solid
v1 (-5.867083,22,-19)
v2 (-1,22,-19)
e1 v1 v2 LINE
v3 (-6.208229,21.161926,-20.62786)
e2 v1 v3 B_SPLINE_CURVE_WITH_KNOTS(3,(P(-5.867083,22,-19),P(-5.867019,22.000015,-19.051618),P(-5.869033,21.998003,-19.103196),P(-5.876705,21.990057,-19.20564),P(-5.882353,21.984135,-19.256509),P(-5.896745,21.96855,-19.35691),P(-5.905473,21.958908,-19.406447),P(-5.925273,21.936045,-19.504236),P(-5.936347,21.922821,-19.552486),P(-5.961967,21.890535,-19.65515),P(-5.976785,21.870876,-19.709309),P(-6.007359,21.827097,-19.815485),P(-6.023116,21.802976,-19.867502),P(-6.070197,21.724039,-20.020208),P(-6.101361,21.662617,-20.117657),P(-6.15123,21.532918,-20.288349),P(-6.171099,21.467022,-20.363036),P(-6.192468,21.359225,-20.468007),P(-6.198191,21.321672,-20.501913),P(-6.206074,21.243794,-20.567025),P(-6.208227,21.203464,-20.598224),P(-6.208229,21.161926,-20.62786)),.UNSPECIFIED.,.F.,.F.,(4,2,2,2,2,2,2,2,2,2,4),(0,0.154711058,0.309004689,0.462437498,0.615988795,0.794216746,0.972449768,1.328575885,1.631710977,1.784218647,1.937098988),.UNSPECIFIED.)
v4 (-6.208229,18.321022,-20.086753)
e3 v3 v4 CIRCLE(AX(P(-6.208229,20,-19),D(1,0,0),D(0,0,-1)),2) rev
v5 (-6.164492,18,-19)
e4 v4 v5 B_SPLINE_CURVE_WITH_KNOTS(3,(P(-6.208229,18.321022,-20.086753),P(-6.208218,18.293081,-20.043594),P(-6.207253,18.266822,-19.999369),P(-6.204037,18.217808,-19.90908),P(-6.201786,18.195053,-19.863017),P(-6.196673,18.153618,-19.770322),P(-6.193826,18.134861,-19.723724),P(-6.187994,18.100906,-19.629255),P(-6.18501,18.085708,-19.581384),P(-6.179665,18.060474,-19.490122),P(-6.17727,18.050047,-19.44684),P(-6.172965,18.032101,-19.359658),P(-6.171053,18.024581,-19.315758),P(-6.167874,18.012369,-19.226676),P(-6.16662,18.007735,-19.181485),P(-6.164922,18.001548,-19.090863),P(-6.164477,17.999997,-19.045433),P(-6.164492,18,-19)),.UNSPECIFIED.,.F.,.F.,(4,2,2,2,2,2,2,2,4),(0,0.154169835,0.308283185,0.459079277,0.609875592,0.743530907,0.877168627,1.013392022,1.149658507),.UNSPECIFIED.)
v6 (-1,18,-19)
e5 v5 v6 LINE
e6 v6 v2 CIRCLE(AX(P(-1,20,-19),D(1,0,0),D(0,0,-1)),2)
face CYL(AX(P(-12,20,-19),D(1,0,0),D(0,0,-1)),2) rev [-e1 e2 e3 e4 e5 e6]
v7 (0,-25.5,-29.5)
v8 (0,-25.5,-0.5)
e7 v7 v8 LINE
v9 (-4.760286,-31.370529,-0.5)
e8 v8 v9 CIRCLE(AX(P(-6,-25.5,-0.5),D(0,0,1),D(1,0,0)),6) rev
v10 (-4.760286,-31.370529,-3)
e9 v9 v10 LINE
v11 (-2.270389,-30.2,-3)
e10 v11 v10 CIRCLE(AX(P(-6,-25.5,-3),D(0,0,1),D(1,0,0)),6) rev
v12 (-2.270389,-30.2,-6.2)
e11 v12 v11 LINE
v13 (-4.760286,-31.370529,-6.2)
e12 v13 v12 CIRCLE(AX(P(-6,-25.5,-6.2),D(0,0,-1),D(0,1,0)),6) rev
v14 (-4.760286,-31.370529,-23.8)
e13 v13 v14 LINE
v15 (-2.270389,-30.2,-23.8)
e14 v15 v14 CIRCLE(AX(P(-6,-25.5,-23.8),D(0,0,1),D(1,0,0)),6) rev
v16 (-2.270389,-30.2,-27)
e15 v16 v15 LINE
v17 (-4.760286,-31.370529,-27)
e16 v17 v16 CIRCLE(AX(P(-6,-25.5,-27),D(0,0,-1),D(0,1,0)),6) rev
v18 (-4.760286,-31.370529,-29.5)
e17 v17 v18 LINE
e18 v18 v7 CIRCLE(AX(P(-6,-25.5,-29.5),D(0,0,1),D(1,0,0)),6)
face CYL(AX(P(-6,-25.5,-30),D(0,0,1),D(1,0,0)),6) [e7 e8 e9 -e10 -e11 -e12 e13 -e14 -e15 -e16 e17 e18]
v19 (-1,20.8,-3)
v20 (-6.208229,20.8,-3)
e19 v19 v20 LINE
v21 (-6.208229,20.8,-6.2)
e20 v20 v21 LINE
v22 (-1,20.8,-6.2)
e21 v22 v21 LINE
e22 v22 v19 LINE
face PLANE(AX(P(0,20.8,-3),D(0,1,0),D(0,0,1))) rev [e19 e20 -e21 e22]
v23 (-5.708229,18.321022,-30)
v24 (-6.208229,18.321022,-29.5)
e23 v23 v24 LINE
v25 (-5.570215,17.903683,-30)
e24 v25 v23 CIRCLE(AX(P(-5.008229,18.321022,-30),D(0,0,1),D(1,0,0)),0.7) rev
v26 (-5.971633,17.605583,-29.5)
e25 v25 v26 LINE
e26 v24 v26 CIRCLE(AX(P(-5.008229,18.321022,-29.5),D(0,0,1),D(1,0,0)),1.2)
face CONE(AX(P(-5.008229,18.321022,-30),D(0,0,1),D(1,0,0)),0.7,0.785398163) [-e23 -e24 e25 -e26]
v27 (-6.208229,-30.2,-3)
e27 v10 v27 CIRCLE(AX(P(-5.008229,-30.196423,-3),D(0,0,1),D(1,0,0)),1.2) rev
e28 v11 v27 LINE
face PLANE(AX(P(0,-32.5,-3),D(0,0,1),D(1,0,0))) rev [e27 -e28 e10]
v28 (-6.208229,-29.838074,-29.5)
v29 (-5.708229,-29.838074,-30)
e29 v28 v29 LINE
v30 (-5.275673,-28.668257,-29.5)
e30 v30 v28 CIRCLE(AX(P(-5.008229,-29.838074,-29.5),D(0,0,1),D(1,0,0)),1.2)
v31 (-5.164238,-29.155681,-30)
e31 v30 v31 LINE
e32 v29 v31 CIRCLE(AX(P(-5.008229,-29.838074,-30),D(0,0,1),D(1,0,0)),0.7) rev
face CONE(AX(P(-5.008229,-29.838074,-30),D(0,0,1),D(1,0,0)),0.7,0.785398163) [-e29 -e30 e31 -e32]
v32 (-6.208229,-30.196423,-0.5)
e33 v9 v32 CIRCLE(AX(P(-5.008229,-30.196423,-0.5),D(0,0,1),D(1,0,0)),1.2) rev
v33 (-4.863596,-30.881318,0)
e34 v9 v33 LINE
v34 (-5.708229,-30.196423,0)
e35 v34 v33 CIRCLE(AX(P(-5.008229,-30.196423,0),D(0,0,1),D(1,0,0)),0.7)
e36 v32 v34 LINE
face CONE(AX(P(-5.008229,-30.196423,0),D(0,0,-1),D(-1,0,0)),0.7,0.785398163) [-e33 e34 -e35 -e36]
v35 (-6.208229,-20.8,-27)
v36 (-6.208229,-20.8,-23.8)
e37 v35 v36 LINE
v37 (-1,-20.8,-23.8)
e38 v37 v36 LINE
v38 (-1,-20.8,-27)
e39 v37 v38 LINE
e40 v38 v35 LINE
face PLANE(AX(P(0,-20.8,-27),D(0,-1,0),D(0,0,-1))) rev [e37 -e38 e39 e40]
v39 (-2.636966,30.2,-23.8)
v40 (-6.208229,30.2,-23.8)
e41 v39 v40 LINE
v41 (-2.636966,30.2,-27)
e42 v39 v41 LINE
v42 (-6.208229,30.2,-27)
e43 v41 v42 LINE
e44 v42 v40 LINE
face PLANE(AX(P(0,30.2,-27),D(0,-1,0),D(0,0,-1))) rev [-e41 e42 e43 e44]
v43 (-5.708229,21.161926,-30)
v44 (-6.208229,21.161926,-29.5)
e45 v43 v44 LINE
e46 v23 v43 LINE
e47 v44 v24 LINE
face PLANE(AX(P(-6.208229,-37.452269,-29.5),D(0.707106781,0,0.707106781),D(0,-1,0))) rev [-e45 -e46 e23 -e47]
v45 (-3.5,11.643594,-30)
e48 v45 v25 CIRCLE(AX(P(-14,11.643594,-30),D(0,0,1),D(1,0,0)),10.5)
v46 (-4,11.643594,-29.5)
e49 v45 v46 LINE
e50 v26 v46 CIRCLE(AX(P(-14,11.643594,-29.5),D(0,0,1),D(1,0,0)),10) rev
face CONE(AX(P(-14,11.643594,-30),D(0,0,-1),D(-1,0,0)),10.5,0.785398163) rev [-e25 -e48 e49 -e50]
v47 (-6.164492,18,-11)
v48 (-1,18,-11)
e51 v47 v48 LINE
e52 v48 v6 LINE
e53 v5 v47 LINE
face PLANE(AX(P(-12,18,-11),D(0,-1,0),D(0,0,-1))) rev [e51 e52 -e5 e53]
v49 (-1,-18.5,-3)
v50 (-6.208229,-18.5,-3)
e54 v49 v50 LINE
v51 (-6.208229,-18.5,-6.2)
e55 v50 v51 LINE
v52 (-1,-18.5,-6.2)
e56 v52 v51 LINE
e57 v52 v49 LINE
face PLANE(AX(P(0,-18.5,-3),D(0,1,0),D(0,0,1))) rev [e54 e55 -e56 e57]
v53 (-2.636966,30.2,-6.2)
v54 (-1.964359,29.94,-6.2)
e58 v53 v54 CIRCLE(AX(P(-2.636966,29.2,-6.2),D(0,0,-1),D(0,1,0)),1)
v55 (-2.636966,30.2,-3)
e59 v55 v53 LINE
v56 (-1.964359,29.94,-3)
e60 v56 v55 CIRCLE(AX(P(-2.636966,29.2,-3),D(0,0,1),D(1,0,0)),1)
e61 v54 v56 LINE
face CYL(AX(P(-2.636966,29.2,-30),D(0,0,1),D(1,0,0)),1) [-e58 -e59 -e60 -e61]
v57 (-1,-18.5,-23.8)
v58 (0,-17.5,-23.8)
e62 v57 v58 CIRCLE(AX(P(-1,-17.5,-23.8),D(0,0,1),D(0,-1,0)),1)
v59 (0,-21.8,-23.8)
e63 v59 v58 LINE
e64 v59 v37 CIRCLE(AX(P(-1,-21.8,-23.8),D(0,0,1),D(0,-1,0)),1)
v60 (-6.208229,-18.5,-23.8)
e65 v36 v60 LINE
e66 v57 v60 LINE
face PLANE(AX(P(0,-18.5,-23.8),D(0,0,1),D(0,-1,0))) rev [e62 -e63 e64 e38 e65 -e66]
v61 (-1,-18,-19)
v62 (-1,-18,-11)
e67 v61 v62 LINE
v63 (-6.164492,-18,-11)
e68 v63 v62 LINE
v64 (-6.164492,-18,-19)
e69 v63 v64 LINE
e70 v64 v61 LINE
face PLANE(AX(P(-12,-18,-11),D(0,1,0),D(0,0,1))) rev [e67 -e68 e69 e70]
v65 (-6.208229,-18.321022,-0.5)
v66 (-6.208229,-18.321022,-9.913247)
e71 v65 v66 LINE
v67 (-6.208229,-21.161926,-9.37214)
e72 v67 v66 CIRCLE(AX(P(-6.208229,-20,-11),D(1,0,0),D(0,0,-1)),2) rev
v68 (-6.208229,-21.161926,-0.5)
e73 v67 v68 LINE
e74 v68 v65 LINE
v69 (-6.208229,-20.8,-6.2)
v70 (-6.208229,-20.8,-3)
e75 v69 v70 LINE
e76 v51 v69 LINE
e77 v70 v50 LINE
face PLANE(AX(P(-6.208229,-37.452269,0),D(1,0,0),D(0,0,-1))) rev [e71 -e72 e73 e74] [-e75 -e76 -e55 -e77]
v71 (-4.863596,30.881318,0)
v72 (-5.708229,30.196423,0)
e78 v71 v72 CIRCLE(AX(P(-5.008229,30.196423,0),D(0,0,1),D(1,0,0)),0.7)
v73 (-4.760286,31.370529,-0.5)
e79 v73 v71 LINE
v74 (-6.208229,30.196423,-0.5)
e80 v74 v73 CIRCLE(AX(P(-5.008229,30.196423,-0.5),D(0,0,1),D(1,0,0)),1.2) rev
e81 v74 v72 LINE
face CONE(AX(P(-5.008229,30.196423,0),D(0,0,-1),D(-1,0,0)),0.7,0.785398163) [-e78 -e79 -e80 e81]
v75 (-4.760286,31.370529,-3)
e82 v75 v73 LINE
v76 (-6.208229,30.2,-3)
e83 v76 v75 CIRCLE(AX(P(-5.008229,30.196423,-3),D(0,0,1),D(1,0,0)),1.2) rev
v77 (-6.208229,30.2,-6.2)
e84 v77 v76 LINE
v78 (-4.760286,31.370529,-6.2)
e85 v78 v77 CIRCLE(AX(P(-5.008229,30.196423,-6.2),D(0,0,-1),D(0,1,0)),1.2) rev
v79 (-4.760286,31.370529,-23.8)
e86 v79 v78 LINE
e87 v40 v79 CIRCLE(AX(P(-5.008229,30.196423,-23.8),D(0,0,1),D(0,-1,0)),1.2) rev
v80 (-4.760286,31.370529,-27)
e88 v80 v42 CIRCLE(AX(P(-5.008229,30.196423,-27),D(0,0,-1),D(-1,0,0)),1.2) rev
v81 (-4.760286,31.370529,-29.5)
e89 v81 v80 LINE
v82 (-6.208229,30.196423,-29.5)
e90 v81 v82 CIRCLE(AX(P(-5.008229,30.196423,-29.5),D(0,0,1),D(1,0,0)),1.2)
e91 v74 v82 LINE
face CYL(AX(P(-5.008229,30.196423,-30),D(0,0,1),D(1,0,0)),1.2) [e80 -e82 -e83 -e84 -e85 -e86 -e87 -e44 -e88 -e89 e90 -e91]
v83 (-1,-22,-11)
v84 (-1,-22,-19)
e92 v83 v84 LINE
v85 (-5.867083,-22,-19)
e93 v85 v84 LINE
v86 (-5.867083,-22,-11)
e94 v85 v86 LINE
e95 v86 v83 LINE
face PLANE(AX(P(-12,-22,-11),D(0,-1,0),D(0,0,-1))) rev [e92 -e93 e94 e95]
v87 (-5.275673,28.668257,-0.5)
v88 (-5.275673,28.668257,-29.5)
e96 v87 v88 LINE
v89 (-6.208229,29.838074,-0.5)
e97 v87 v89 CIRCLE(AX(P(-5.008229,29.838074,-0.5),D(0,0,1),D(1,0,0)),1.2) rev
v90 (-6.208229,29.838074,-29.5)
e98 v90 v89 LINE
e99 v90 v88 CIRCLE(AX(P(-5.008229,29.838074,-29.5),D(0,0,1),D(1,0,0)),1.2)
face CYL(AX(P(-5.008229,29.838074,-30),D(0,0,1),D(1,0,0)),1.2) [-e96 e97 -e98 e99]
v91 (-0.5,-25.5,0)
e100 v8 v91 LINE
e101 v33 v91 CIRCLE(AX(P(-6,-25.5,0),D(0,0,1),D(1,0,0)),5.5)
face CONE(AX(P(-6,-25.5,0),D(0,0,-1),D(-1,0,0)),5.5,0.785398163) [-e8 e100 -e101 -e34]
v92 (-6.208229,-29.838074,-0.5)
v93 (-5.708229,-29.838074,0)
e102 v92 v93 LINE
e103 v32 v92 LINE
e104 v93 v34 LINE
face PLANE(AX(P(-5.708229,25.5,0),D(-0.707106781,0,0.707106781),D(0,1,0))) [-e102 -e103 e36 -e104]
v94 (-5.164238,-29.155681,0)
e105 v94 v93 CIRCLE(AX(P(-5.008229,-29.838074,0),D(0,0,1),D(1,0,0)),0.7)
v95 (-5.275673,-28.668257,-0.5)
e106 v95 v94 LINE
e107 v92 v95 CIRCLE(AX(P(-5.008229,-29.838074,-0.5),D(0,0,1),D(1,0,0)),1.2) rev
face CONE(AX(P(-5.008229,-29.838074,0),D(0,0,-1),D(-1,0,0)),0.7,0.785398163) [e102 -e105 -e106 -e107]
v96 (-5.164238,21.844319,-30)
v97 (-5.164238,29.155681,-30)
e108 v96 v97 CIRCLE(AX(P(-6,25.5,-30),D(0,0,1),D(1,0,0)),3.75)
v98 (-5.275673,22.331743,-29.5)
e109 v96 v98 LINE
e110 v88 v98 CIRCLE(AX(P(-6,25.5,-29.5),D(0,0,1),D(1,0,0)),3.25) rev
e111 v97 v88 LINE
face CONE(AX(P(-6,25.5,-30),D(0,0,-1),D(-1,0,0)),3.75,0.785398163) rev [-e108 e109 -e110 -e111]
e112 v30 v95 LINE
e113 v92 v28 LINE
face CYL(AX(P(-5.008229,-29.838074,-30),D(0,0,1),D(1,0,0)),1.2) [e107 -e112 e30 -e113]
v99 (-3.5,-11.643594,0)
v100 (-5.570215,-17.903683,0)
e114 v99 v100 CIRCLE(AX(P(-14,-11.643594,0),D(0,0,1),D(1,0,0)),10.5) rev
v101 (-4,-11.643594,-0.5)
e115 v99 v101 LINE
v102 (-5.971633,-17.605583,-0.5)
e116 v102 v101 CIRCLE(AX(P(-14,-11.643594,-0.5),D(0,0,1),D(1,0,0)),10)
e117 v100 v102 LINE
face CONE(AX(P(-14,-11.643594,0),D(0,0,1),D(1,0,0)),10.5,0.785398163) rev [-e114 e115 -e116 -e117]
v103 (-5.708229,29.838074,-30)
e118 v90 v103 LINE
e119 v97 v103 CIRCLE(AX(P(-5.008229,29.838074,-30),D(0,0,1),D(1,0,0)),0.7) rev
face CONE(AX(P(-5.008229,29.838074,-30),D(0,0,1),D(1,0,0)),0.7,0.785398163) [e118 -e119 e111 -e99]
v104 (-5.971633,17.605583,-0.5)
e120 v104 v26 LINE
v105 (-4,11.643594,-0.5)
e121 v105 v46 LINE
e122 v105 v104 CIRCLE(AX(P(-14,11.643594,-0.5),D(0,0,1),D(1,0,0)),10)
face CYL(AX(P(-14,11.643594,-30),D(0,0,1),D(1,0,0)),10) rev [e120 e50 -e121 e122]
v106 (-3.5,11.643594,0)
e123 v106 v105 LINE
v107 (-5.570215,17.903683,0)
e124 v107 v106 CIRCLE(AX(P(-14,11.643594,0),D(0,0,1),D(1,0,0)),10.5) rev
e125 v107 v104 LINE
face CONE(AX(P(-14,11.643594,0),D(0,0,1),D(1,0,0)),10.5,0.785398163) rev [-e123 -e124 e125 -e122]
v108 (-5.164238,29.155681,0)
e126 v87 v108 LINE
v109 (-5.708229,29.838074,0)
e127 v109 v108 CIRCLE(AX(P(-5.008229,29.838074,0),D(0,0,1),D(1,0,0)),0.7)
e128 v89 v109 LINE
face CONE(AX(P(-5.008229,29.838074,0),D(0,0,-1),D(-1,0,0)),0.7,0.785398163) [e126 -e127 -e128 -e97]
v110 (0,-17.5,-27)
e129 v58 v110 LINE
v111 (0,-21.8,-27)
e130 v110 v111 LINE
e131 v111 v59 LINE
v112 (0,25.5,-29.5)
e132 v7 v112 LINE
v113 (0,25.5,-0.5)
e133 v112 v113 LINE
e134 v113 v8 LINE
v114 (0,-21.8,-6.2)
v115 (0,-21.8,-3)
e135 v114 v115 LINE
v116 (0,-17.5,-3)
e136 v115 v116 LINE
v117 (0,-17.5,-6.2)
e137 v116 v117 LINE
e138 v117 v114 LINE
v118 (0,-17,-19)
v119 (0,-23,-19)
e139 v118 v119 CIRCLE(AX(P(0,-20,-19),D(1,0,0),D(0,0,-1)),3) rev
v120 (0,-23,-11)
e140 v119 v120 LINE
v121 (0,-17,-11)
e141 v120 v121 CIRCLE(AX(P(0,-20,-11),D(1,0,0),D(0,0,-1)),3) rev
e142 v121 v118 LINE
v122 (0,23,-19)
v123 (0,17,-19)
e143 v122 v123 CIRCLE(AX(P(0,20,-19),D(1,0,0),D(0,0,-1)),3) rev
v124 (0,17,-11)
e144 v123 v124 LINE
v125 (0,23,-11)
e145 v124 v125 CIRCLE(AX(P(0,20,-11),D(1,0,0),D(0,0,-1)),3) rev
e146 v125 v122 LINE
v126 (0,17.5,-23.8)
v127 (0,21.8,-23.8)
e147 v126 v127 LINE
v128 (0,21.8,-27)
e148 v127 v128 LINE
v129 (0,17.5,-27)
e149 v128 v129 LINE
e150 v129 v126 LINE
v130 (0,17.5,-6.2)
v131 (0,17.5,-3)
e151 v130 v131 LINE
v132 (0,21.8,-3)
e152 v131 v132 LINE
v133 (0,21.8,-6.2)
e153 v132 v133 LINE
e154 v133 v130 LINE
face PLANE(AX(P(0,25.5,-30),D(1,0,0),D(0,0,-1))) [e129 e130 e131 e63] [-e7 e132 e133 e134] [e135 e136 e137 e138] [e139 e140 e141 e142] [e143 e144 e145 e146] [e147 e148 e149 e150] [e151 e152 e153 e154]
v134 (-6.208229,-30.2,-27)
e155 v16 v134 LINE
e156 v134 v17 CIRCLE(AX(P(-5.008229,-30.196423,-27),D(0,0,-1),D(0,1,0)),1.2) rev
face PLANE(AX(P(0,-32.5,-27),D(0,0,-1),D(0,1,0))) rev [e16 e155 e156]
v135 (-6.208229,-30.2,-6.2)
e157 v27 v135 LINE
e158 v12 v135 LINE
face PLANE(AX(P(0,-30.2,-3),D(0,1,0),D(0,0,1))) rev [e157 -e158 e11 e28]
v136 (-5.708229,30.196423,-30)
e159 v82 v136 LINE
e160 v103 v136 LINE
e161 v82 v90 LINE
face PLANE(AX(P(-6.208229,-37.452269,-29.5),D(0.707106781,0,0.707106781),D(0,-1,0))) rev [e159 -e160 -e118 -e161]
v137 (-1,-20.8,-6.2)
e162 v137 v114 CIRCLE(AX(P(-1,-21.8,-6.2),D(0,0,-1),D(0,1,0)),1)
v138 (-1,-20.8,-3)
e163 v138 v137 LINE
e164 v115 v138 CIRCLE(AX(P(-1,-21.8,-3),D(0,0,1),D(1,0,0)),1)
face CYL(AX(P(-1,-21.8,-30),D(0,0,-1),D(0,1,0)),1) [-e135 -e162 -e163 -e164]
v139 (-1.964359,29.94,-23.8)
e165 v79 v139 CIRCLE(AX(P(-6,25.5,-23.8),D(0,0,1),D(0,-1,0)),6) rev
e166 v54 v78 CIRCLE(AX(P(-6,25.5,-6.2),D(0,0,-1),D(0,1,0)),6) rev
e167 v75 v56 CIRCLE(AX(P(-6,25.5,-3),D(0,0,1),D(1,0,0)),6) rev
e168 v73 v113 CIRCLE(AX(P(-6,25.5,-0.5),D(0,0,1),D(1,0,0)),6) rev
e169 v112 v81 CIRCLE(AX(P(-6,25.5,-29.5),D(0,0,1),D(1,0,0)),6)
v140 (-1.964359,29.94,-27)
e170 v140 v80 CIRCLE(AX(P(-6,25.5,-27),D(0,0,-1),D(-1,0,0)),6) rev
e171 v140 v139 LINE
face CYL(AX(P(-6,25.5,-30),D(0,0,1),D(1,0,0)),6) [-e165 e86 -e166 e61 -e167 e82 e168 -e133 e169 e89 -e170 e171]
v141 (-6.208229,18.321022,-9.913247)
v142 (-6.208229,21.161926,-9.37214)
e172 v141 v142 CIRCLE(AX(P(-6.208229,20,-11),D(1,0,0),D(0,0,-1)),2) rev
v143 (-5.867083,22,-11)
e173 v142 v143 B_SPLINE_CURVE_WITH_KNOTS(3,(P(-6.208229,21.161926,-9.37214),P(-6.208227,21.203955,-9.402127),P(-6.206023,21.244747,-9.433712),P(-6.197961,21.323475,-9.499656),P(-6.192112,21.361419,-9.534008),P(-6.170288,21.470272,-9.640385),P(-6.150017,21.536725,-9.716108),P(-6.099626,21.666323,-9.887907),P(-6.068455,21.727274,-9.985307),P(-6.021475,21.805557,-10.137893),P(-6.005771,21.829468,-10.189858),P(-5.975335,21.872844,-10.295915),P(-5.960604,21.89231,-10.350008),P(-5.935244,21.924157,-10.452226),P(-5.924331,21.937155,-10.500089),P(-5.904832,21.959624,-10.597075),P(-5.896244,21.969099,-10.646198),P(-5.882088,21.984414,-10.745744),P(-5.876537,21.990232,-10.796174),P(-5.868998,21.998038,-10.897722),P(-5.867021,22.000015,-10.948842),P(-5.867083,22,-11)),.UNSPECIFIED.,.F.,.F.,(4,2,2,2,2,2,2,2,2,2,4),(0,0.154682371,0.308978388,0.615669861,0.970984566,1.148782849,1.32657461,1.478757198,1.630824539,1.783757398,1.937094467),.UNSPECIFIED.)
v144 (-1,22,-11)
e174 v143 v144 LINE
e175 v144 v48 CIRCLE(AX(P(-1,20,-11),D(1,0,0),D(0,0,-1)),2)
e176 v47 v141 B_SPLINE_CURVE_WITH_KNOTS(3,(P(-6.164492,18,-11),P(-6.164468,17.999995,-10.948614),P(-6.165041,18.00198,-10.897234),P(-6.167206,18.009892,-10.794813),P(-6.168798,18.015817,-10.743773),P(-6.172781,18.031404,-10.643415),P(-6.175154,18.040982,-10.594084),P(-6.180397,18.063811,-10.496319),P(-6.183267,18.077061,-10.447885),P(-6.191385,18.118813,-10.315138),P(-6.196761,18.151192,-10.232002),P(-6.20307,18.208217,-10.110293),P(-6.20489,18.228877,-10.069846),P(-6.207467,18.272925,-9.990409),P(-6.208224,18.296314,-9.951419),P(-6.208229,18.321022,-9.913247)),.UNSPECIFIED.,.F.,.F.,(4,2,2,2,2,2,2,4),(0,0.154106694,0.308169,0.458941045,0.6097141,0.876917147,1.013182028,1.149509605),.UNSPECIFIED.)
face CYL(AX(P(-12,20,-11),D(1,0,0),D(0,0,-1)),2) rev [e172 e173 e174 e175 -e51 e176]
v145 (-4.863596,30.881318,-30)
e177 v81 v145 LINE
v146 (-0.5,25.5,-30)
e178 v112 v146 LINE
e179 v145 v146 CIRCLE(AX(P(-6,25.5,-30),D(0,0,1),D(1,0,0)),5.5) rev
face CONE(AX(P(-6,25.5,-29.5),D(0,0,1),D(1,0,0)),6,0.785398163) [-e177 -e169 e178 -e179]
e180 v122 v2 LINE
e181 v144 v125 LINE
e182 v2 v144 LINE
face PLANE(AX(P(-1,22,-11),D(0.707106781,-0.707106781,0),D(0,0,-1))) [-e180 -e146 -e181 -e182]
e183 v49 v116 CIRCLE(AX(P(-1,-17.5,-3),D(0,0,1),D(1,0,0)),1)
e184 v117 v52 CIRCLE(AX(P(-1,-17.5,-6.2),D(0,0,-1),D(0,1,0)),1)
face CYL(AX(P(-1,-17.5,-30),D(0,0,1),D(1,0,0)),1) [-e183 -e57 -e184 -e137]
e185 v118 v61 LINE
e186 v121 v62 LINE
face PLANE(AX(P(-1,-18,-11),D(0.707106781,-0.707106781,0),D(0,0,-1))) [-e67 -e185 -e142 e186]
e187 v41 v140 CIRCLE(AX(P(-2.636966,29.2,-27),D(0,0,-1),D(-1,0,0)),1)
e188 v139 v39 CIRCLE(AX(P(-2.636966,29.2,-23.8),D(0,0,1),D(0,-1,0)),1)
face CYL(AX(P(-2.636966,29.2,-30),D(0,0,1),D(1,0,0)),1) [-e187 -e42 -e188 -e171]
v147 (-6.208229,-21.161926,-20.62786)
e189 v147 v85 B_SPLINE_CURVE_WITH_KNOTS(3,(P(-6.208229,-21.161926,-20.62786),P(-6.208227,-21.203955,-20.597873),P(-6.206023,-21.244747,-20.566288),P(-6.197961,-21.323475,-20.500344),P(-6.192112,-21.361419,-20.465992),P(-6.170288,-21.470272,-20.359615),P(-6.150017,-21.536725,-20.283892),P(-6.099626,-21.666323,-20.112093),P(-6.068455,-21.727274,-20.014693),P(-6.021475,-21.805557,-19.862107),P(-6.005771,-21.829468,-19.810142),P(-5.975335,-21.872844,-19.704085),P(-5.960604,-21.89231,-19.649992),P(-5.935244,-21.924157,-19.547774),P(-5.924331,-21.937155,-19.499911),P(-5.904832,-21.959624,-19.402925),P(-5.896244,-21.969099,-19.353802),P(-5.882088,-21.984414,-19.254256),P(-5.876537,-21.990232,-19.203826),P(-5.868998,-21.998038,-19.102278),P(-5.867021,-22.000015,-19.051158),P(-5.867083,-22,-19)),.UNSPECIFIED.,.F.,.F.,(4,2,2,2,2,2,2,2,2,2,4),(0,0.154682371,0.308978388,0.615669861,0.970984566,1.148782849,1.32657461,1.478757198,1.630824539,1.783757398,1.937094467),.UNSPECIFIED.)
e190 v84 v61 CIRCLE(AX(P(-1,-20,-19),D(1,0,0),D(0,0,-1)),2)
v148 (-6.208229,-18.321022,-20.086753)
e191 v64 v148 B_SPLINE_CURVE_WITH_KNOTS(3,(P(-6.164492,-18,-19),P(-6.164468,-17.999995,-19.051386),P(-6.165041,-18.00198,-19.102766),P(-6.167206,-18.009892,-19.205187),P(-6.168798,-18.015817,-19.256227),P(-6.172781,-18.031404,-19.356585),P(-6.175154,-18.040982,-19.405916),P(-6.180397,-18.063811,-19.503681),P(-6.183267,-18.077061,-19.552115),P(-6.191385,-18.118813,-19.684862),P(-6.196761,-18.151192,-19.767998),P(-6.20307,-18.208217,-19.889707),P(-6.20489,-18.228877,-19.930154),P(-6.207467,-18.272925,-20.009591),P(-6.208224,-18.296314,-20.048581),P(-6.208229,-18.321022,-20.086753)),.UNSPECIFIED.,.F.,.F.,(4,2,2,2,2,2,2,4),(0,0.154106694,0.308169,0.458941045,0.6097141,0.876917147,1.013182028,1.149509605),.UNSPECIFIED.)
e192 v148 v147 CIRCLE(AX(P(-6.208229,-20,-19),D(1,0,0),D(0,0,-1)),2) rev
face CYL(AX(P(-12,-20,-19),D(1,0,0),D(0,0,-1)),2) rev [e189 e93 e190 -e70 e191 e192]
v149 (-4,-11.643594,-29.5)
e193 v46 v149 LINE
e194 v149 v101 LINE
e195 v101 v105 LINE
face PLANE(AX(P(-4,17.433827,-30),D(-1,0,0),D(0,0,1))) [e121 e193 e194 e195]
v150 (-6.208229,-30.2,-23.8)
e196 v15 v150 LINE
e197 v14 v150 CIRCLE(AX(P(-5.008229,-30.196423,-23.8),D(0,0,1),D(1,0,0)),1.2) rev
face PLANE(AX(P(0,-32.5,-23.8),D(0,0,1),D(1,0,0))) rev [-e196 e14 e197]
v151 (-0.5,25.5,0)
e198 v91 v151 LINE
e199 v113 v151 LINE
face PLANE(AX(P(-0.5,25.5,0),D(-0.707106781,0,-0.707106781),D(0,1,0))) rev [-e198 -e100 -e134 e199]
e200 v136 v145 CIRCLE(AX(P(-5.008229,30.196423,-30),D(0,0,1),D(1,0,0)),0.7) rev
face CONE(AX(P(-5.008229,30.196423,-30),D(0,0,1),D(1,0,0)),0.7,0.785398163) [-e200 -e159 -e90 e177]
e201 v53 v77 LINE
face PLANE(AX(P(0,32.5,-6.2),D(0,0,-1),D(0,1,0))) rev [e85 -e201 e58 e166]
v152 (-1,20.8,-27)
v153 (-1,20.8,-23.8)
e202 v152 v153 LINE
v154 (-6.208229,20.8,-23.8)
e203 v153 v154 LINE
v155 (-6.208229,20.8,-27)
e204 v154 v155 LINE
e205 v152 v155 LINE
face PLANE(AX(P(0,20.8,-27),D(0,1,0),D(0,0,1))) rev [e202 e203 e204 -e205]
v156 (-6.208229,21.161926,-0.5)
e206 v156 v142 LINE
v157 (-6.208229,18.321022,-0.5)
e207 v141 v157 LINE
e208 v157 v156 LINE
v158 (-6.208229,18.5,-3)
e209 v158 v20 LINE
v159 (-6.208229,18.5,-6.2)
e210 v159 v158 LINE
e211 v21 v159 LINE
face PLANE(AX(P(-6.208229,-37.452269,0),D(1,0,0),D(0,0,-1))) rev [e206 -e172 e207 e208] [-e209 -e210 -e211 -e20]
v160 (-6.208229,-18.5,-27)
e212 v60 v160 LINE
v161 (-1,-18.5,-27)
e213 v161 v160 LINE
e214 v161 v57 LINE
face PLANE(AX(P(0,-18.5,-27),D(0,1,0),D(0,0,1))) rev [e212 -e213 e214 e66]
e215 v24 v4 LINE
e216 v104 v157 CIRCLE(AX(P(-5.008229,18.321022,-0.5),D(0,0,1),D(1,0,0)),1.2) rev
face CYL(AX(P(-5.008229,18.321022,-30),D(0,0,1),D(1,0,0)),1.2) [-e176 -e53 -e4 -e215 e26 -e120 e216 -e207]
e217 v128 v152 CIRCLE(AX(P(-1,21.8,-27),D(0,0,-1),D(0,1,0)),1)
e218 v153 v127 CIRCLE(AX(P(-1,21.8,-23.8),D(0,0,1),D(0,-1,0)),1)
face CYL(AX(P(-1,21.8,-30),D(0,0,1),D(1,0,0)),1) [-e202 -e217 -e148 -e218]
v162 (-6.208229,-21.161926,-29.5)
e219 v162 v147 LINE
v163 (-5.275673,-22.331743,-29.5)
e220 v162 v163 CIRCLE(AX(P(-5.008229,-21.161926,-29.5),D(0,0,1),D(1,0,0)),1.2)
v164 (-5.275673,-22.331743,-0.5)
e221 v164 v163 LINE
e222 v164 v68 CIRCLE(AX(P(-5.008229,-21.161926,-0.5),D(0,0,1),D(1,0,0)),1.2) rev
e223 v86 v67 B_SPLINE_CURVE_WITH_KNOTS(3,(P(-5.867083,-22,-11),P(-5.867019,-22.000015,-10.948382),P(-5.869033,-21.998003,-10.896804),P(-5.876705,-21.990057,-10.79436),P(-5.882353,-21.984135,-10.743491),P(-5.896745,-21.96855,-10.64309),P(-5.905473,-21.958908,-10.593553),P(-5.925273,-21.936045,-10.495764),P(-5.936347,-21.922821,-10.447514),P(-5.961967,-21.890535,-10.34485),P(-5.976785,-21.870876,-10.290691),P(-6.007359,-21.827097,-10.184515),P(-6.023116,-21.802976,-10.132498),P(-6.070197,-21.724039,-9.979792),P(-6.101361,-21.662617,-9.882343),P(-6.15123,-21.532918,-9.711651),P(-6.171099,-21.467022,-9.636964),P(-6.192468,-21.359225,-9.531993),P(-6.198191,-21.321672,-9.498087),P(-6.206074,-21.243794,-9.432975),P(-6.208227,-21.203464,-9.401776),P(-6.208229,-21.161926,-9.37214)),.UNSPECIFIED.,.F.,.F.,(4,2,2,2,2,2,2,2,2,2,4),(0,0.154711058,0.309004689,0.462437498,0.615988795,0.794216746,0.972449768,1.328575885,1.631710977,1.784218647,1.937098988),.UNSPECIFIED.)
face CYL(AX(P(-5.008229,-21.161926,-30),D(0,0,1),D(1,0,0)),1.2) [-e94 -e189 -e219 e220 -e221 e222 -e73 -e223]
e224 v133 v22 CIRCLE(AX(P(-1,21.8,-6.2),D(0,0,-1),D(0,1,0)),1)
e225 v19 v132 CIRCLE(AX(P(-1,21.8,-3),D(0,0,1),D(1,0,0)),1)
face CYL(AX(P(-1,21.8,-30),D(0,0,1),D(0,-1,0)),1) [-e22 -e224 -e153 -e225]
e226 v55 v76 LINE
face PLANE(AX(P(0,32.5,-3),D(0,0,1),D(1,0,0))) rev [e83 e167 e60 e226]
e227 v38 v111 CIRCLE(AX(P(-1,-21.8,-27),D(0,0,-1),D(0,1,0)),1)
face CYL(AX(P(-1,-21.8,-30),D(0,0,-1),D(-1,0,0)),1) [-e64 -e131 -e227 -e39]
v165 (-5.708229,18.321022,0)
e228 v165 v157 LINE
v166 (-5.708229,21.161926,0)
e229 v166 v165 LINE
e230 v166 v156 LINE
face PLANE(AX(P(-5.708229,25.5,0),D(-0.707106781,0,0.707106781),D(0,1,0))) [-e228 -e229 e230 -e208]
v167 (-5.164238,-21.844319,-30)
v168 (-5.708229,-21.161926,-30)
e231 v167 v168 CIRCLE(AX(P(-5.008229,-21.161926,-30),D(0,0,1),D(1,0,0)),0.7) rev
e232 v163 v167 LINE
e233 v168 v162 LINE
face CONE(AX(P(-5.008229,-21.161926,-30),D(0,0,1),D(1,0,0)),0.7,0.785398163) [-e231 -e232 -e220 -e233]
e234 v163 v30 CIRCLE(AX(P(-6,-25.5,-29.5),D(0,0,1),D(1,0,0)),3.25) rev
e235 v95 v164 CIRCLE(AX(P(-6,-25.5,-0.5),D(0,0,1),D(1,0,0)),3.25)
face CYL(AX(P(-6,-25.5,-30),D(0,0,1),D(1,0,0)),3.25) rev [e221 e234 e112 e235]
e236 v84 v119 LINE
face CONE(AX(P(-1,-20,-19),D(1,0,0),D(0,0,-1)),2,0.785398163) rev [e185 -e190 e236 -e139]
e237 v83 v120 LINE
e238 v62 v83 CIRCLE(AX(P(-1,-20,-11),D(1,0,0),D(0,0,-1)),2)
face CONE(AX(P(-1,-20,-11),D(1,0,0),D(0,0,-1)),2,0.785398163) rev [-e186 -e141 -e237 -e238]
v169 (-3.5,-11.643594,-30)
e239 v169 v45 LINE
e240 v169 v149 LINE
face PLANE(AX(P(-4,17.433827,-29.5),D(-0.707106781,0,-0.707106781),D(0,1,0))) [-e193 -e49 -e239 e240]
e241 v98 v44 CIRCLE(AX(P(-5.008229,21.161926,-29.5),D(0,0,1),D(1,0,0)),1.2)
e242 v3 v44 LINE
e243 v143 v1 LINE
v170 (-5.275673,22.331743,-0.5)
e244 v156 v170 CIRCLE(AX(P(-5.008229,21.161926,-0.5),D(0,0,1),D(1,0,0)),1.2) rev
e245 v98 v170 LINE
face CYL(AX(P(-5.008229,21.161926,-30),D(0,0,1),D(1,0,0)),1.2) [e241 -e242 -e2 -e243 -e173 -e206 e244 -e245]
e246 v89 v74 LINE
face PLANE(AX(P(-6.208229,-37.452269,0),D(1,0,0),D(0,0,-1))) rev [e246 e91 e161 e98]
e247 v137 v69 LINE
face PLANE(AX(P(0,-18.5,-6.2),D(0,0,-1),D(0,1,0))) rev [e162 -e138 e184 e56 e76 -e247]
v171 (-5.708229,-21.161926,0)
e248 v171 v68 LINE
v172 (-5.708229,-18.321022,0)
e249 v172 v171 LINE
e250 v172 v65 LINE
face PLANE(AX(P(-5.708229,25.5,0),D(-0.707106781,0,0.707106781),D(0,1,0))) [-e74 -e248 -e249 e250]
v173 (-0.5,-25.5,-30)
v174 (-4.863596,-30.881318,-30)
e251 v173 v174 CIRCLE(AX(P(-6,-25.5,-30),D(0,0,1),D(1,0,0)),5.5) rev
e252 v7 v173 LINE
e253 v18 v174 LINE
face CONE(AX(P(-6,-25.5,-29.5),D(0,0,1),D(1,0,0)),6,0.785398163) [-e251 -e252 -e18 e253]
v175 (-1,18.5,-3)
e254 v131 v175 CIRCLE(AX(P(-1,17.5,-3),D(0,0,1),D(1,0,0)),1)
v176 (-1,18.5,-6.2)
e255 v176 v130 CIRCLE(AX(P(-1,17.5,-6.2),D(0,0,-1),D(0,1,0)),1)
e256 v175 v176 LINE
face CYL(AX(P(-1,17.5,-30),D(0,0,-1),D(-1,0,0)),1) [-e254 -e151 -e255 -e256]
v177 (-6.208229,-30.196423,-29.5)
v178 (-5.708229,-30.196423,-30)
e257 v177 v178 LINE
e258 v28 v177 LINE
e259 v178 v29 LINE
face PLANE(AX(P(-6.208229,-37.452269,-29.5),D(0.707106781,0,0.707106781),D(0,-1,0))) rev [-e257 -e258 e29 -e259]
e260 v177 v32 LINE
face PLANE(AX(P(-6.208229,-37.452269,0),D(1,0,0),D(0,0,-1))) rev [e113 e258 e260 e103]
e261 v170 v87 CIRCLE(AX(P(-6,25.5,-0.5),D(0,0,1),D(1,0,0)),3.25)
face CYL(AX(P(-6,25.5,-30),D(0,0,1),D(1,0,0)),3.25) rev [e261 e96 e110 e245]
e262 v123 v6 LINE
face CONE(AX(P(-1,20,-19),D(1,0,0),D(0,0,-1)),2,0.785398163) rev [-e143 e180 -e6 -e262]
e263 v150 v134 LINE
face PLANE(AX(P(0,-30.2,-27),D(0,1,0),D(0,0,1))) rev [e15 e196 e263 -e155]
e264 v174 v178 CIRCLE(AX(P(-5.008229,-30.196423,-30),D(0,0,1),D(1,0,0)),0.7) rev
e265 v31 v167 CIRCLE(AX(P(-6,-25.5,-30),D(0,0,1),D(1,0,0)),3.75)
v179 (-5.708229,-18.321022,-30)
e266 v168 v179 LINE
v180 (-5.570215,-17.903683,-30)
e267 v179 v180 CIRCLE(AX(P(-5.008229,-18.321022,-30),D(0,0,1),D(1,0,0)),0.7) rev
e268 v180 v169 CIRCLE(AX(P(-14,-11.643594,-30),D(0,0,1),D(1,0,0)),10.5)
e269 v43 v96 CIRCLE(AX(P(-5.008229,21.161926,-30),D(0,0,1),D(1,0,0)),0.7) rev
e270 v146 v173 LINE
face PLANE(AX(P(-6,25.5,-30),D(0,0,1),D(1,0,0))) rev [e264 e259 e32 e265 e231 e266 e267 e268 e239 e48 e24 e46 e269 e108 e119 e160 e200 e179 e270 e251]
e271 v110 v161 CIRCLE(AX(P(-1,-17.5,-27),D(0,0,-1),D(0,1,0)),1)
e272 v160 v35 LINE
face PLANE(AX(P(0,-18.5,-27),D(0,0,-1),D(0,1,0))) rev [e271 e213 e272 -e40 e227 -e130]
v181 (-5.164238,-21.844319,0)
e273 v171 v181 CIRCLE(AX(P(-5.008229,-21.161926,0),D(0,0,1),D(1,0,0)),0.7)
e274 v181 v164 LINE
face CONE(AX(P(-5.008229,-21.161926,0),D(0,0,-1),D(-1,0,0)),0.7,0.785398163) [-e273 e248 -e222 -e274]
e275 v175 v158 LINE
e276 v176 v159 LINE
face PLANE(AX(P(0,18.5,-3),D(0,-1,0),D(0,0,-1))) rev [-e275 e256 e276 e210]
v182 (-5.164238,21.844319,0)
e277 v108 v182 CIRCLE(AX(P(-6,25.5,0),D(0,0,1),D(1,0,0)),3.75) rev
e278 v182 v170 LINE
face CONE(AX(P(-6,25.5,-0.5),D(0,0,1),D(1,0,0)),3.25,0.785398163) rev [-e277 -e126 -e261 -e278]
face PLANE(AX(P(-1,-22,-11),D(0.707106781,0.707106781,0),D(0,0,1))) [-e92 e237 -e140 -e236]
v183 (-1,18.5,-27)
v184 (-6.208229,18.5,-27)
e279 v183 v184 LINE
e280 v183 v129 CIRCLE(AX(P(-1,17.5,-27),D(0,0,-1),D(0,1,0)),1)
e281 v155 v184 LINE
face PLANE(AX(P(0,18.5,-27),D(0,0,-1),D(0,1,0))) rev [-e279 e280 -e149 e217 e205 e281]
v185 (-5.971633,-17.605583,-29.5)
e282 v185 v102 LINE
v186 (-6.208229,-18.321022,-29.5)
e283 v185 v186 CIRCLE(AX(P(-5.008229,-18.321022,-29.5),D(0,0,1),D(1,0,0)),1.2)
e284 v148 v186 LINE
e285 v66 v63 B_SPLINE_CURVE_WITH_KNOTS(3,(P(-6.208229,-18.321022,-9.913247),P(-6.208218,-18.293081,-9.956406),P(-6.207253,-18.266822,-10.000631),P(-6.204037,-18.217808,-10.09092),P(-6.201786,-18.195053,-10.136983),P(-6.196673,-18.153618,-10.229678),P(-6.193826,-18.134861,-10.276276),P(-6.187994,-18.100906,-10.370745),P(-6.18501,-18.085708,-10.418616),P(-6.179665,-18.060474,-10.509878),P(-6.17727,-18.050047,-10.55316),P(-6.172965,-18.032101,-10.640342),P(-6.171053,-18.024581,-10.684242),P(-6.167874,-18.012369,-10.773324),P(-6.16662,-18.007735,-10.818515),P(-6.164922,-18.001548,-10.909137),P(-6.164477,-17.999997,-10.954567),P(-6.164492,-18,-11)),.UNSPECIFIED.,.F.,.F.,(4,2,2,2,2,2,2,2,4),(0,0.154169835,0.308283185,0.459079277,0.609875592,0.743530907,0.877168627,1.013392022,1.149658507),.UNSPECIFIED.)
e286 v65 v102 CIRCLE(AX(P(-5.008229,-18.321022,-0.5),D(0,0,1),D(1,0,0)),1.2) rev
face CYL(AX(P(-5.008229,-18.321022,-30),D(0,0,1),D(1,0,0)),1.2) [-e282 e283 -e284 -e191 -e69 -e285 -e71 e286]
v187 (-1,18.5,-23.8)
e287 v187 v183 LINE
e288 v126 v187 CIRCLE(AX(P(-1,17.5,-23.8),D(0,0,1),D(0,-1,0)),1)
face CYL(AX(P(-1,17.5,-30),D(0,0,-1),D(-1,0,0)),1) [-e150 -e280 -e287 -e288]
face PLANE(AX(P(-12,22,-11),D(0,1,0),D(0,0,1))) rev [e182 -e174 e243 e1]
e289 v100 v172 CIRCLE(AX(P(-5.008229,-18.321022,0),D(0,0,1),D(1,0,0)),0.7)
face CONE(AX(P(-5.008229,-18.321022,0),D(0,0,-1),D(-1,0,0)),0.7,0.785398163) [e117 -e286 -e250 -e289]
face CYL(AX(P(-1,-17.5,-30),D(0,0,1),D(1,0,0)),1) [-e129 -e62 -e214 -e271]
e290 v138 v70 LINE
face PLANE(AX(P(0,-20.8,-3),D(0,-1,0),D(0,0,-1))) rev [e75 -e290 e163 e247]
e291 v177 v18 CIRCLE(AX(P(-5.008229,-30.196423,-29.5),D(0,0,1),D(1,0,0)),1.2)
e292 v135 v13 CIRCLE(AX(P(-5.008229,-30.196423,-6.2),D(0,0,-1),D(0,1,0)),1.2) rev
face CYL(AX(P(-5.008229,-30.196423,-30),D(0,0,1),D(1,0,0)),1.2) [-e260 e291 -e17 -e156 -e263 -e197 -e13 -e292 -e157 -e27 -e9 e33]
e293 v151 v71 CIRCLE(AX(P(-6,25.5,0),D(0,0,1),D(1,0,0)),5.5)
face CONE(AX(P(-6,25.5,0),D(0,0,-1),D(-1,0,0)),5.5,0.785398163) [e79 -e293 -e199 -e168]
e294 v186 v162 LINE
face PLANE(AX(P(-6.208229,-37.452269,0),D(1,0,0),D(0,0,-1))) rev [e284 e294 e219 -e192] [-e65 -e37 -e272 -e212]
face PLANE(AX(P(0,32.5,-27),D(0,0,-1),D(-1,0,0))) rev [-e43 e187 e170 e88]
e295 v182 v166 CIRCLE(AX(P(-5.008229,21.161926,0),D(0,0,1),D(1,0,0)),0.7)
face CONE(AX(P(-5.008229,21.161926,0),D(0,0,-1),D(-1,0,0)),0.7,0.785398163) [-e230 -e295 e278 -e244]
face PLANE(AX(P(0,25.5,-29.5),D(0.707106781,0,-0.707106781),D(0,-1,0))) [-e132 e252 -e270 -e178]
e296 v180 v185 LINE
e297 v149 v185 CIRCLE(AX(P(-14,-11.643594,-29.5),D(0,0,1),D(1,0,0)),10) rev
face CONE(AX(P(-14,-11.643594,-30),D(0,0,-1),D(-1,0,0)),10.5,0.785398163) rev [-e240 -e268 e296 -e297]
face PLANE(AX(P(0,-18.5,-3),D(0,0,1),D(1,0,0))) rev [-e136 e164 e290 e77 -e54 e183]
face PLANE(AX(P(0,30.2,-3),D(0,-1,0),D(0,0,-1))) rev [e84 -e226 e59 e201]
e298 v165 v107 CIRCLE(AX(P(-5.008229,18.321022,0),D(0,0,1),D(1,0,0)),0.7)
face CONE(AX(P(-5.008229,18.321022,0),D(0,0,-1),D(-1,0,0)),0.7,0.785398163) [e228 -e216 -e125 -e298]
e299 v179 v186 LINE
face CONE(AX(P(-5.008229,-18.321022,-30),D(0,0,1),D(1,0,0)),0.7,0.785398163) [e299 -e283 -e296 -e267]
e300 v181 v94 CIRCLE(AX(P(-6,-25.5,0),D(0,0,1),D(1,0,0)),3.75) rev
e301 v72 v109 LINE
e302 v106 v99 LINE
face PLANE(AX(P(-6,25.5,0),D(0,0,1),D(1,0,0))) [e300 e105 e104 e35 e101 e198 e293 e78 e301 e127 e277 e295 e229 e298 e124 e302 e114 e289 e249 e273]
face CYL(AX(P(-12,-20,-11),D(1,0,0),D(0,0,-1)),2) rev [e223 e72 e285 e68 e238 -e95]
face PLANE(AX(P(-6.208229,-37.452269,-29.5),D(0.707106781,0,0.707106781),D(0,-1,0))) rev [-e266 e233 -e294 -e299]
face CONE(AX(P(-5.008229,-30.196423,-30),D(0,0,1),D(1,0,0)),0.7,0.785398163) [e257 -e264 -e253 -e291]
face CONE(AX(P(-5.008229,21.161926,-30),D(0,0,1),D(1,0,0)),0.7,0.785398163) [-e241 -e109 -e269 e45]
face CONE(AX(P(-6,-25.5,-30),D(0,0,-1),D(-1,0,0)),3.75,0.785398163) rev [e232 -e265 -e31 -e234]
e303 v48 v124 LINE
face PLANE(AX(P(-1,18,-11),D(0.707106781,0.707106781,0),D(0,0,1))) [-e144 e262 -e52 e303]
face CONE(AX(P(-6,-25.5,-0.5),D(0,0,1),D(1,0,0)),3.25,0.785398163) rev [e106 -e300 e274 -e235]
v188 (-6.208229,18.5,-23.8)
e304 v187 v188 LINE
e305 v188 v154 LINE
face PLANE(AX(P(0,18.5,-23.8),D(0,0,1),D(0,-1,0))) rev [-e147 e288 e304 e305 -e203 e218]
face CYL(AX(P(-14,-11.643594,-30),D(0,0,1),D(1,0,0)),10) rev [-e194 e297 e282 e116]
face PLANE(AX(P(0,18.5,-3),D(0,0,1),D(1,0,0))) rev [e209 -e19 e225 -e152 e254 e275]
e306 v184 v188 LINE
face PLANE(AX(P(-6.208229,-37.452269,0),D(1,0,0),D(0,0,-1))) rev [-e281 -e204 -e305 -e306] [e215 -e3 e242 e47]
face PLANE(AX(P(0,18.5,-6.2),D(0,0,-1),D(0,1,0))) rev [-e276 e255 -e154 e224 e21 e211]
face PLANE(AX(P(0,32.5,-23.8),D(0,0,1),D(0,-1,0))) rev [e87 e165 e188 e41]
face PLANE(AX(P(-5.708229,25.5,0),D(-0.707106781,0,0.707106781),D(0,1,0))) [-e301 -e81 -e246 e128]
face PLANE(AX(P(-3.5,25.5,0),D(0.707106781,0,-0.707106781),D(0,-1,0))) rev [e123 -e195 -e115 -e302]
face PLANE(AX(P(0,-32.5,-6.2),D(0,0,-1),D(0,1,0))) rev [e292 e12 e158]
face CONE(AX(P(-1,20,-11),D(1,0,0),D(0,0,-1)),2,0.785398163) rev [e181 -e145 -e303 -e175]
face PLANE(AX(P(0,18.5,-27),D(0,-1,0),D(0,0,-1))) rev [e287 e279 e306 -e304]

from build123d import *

# Parameters (mm, degrees)
CROQUIS1_R                 = 3.25
SALIENTE_EXTRUIR1_DEPTH    = 30
REDONDEO1_R                = 10
CORTAR_EXTRUIR1_DEPTH      = 46.124827032
CROQUIS3_W                 = 19.168620823
CROQUIS3_H                 = 82.221468015
CORTAR_EXTRUIR2_DEPTH      = 46.124827032
CORTAR_EXTRUIR7_DEPTH      = 44.68352107
CORTAR_EXTRUIR7_DEPTH_BACK = 44.68352107
CROQUIS4_W                 = 3.2
CROQUIS4_H                 = 2.3
REDONDEO2_R                = 1.2
REDONDEO4_R                = 1
CHAMFER1_SIZE              = 0.5
CHAMFER2_SIZE              = 1


with BuildPart() as part:
    # Croquis1 → Saliente-Extruir1 (new body)
    with BuildSketch(Plane.XY):
        with BuildLine():
            Line((-4, 17.433827309), (-8.98691391, 20.296314259))
            ThreePointArc((-8.98691391, 20.296314259), (-9.006535925, 30.69237342), (0, 25.5))
            Line((0, 25.5), (0, -25.5))
            ThreePointArc((0, -25.5), (-9.006535925, -30.69237342), (-8.98691391, -20.296314259))
            Line((-8.98691391, -20.296314259), (-4, -17.433827309))
            Line((-4, -17.433827309), (-4, 17.433827309))
        make_face()
        with Locations((-6, 25.5)):
            Circle(CROQUIS1_R, mode=Mode.SUBTRACT)
        with Locations(Location((-6, -25.5, 0), (0, 0, 180))):
            Circle(CROQUIS1_R, mode=Mode.SUBTRACT)
    extrude(amount=-SALIENTE_EXTRUIR1_DEPTH)

    # Redondeo1
    redondeo1_edges = [part.edges().sort_by_distance(p)[0] for p in [
        (-4, -17.433827309, -15),
        (-4, 17.433827309, -15),
    ]]
    fillet(redondeo1_edges, radius=REDONDEO1_R)

    # Croquis2 → Cortar-Extruir1 (cut, through all)
    with BuildSketch(Plane(origin=(0, 0, 0), x_dir=(0, 0, -1), z_dir=(1, 0, 0))):
        with BuildLine():
            Line((11, 22), (19, 22))
            ThreePointArc((19, 22), (21, 20), (19, 18))
            Line((19, 18), (11, 18))
            ThreePointArc((11, 18), (9, 20), (11, 22))
        make_face()
        with BuildLine():
            Line((11, -22), (19, -22))
            ThreePointArc((19, -22), (21, -20), (19, -18))
            Line((19, -18), (11, -18))
            ThreePointArc((11, -18), (9, -20), (11, -22))
        make_face()
    extrude(amount=-CORTAR_EXTRUIR1_DEPTH, mode=Mode.SUBTRACT)

    # Croquis3 → Cortar-Extruir2 (cut, through all)
    with BuildSketch(Plane(origin=(0, 0, -30), x_dir=(-1, 0, 0), z_dir=(0, 0, -1))):
        with Locations((15.792539244, 3.658464898)):
            Rectangle(CROQUIS3_W, CROQUIS3_H)
    extrude(amount=-CORTAR_EXTRUIR2_DEPTH, mode=Mode.SUBTRACT)

    # Croquis4 → Cortar-Extruir7 (cut, two sides: drawn at the far end of the back side and taken through both)
    with BuildSketch(Plane.ZY.offset(4).offset(-CORTAR_EXTRUIR7_DEPTH_BACK)):
        with Locations((-4.6, 31.35)):
            Rectangle(CROQUIS4_W, CROQUIS4_H)
        with Locations((-25.4, 31.35)):
            Rectangle(CROQUIS4_W, CROQUIS4_H)
        with Locations((-25.4, 19.65)):
            Rectangle(CROQUIS4_W, CROQUIS4_H)
        with Locations((-4.6, 19.65)):
            Rectangle(CROQUIS4_W, CROQUIS4_H)
        with Locations((-4.6, -19.65)):
            Rectangle(CROQUIS4_W, CROQUIS4_H)
        with Locations((-25.4, -19.65)):
            Rectangle(CROQUIS4_W, CROQUIS4_H)
        with Locations((-4.6, -31.35)):
            Rectangle(CROQUIS4_W, CROQUIS4_H)
        with Locations((-25.4, -31.35)):
            Rectangle(CROQUIS4_W, CROQUIS4_H)
    extrude(amount=CORTAR_EXTRUIR7_DEPTH + CORTAR_EXTRUIR7_DEPTH_BACK, mode=Mode.SUBTRACT)

    # Redondeo2
    # the kernel refuses this fillet: 1.2 mm, written as the material it takes off along each edge
    with BuildSketch(Plane(origin=(-6.208228832, 31.496385641, -6.633505757), x_dir=(0.9962436341156765, -0.08659458114680287, 0), z_dir=(0, 0, 1)), Plane(origin=(-6.208228832, 31.496385641, -33.633505757), x_dir=(0.9962436341156765, -0.08659458114680287, 0), z_dir=(0, 0, 1))) as redondeo2_piece_1:
        with BuildLine():
            CenterArc((1.308062073, -1.191165907), REDONDEO2_R, 83.043435968, 101.924289818)
            Line((0.112569712, -1.295079404), (0, 0))
            ThreePointArc((0, 0), (0.726701151, 0.044170466), (1.453402303, 0))
        make_face()
    extrude(amount=10.267011514, mode=Mode.SUBTRACT)
    with BuildSketch(Plane(origin=(-6.208228832, -31.496385641, -33.633505757), x_dir=(0.9962436341156764, 0.08659458114680295, 0), z_dir=(0, 0, 1)), Plane(origin=(-6.208228832, -31.496385641, -6.633505757), x_dir=(0.9962436341156764, 0.08659458114680295, 0), z_dir=(0, 0, 1))) as redondeo2_piece_2:
        with BuildLine():
            CenterArc((1.308062073, 1.191165907), REDONDEO2_R, 175.032274214, 101.924289818)
            Line((0.112569712, 1.295079404), (0, 0))
            ThreePointArc((0, 0), (0.726701151, -0.044170466), (1.453402303, 0))
        make_face()
    extrude(amount=10.267011514, mode=Mode.SUBTRACT)
    with BuildSketch(Plane(origin=(-6.208228832, 28.743322487, -32.736879913), x_dir=(0, 1, 0), z_dir=(0, 0, 1))) as redondeo2_piece_3:
        with BuildLine():
            CenterArc((1.094751965, -1.2), REDONDEO2_R, 90, 77.122346342)
            ThreePointArc((-0.075065865, -0.93255609), (-0.003800627, -0.468993318), (0, 0))
            Line((0, 0), (1.094751965, 0))
        make_face()
    extrude(amount=35.473759826, mode=Mode.SUBTRACT)
    with BuildSketch(Plane(origin=(-6.208228832, 22.256677513, -32.736879913), x_dir=(0, -1, 0), z_dir=(0, 0, 1)), Plane(origin=(-6.208228832, -28.743322487, -32.736879913), x_dir=(0, -1, 0), z_dir=(0, 0, 1))) as redondeo2_piece_4:
        with BuildLine():
            CenterArc((1.094751965, 1.2), REDONDEO2_R, 192.877653658, 77.122346342)
            ThreePointArc((-0.075065865, 0.93255609), (-0.003800627, 0.468993318), (0, 0))
            Line((0, 0), (1.094751965, 0))
        make_face()
    extrude(amount=35.473759826, mode=Mode.SUBTRACT)
    with BuildSketch(Plane(origin=(-6.208228832, 17.911631675, 1.023475891), x_dir=(0.6116158089577609, -0.7911549167090751, 0), z_dir=(0, 0, -1))) as redondeo2_piece_5:
        with BuildLine():
            CenterArc((0.410047777, -1.199775514), REDONDEO2_R, 91.108276989, 36.598151405)
            Line((-0.323891193, -0.250389614), (0, 0))
            ThreePointArc((0, 0), (0.193418763, -0.001870716), (0.386837526, 0))
        make_face()
    extrude(amount=32.046951782, mode=Mode.SUBTRACT)
    with BuildSketch(Plane(origin=(-6.208228832, -22.256677513, -32.736879913), x_dir=(0.9967759569904702, -0.0802352264640189, 0), z_dir=(0, 0, 1))) as redondeo2_piece_6:
        with BuildLine():
            CenterArc((1.108293477, 1.187504709), REDONDEO2_R, 184.602086684, 77.122346342)
            Line((-0.087837672, 1.091222438), (0, 0))
            ThreePointArc((0, 0), (0.467786208, 0.033841412), (0.935572415, 0))
        make_face()
    extrude(amount=35.473759826, mode=Mode.SUBTRACT)
    with BuildSketch(Plane(origin=(-6.208228832, -17.911631675, 1.023475891), x_dir=(0, -1, 0), z_dir=(0, 0, -1))) as redondeo2_piece_7:
        with BuildLine():
            CenterArc((0.409390356, -1.2), REDONDEO2_R, 90, 36.598151405)
            ThreePointArc((-0.306048411, -0.236595946), (-0.151880046, -0.119777999), (0, 0))
            Line((0, 0), (0.409390356, 0))
        make_face()
    extrude(amount=32.046951782, mode=Mode.SUBTRACT)
    with BuildSketch(Plane(origin=(-6.208228832, 31.496385641, -27.433505757), x_dir=(0.9962436341156765, -0.08659458114680287, 0), z_dir=(0, 0, 1))) as redondeo2_piece_8:
        with BuildLine():
            CenterArc((1.308062073, -1.191165907), REDONDEO2_R, 83.043435968, 101.924289818)
            Line((0.112569712, -1.295079404), (0, 0))
            ThreePointArc((0, 0), (0.726701151, 0.044170466), (1.453402303, 0))
        make_face()
    extrude(amount=24.867011514, mode=Mode.SUBTRACT)
    with BuildSketch(Plane(origin=(-6.208228832, -31.496385641, -27.433505757), x_dir=(0.9962436341156764, 0.08659458114680295, 0), z_dir=(0, 0, 1))) as redondeo2_piece_9:
        with BuildLine():
            CenterArc((1.308062073, 1.191165907), REDONDEO2_R, 175.032274214, 101.924289818)
            Line((0.112569712, 1.295079404), (0, 0))
            ThreePointArc((0, 0), (0.726701151, -0.044170466), (1.453402303, 0))
        make_face()
    extrude(amount=24.867011514, mode=Mode.SUBTRACT)

    # Redondeo4
    redondeo4_edges = [part.edges().sort_by_distance(p)[0] for p in [
        (0, -18.5, -25.4),
        (0, -20.8, -25.4),
        (0, -18.5, -4.6),
        (0, -20.8, -4.6),
        (-2.27038876, 30.2, -4.6),
        (0, 18.5, -25.4),
        (0, 20.8, -25.4),
        (0, 18.5, -4.6),
        (0, 20.8, -4.6),
        (-2.27038876, 30.2, -25.4),
    ]]
    fillet(redondeo4_edges, radius=REDONDEO4_R)

    # Chamfer1
    chamfer1_edges = [part.edges().sort_by_distance(p)[0] for p in [
        (0, 0, -30),
        (-4, 0, 0),
        (-4, 0, -30),
        (-6.208228832, -30.017248777, 0),
        (-6.208228832, -30.017248777, -30),
        (-1.339619985, -29.279002265, 0),
        (-6.208228832, 30.017248777, 0),
        (-2.75, 25.5, 0),
        (-6.208228832, 19.74147379, 0),
        (-4.505694572, 14.783364937, 0),
        (-6.208228832, -19.74147379, 0),
        (-2.75, -25.5, 0),
        (-5.946560515, 29.09005463, 0),
        (-5.946560515, 21.90994537, 0),
        (-5.764029285, 31.128499105, 0),
        (-6.147545484, 17.944249464, 0),
        (-6.147545484, -17.944249464, 0),
        (-5.946560515, -21.90994537, 0),
        (-5.946560515, -29.09005463, 0),
        (-5.764029285, -31.128499105, 0),
        (-1.339619985, -29.279002265, -30),
        (-6.208228832, 30.017248777, -30),
        (-2.75, -25.5, -30),
        (-6.208228832, -19.74147379, -30),
        (-4.505694572, -14.783364937, -30),
        (-6.208228832, 19.74147379, -30),
        (-2.75, 25.5, -30),
        (-5.946560515, 29.09005463, -30),
        (-5.946560515, 21.90994537, -30),
        (-6.147545484, 17.944249464, -30),
        (-6.147545484, -17.944249464, -30),
        (-5.946560515, -21.90994537, -30),
        (-5.946560515, -29.09005463, -30),
        (-5.764029285, -31.128499105, -30),
        (-5.764029285, 31.128499105, -30),
        (-4.505694572, -14.783364937, 0),
        (-4.505694572, 14.783364937, -30),
        (-1.339619985, 29.279002265, -30),
        (0, 0, 0),
        (-1.339619985, 29.279002265, 0),
    ]]
    chamfer(chamfer1_edges, length=CHAMFER1_SIZE)

    # Chamfer2
    chamfer2_edges = [part.edges().sort_by_distance(p)[0] for p in [
        (0, 20, -9),
        (0, 18, -15),
        (0, 20, -21),
        (0, 22, -15),
        (0, -20, -9),
        (0, -22, -15),
        (0, -20, -21),
        (0, -18, -15),
    ]]
    chamfer(chamfer2_edges, length=CHAMFER2_SIZE)


solid = part.part
